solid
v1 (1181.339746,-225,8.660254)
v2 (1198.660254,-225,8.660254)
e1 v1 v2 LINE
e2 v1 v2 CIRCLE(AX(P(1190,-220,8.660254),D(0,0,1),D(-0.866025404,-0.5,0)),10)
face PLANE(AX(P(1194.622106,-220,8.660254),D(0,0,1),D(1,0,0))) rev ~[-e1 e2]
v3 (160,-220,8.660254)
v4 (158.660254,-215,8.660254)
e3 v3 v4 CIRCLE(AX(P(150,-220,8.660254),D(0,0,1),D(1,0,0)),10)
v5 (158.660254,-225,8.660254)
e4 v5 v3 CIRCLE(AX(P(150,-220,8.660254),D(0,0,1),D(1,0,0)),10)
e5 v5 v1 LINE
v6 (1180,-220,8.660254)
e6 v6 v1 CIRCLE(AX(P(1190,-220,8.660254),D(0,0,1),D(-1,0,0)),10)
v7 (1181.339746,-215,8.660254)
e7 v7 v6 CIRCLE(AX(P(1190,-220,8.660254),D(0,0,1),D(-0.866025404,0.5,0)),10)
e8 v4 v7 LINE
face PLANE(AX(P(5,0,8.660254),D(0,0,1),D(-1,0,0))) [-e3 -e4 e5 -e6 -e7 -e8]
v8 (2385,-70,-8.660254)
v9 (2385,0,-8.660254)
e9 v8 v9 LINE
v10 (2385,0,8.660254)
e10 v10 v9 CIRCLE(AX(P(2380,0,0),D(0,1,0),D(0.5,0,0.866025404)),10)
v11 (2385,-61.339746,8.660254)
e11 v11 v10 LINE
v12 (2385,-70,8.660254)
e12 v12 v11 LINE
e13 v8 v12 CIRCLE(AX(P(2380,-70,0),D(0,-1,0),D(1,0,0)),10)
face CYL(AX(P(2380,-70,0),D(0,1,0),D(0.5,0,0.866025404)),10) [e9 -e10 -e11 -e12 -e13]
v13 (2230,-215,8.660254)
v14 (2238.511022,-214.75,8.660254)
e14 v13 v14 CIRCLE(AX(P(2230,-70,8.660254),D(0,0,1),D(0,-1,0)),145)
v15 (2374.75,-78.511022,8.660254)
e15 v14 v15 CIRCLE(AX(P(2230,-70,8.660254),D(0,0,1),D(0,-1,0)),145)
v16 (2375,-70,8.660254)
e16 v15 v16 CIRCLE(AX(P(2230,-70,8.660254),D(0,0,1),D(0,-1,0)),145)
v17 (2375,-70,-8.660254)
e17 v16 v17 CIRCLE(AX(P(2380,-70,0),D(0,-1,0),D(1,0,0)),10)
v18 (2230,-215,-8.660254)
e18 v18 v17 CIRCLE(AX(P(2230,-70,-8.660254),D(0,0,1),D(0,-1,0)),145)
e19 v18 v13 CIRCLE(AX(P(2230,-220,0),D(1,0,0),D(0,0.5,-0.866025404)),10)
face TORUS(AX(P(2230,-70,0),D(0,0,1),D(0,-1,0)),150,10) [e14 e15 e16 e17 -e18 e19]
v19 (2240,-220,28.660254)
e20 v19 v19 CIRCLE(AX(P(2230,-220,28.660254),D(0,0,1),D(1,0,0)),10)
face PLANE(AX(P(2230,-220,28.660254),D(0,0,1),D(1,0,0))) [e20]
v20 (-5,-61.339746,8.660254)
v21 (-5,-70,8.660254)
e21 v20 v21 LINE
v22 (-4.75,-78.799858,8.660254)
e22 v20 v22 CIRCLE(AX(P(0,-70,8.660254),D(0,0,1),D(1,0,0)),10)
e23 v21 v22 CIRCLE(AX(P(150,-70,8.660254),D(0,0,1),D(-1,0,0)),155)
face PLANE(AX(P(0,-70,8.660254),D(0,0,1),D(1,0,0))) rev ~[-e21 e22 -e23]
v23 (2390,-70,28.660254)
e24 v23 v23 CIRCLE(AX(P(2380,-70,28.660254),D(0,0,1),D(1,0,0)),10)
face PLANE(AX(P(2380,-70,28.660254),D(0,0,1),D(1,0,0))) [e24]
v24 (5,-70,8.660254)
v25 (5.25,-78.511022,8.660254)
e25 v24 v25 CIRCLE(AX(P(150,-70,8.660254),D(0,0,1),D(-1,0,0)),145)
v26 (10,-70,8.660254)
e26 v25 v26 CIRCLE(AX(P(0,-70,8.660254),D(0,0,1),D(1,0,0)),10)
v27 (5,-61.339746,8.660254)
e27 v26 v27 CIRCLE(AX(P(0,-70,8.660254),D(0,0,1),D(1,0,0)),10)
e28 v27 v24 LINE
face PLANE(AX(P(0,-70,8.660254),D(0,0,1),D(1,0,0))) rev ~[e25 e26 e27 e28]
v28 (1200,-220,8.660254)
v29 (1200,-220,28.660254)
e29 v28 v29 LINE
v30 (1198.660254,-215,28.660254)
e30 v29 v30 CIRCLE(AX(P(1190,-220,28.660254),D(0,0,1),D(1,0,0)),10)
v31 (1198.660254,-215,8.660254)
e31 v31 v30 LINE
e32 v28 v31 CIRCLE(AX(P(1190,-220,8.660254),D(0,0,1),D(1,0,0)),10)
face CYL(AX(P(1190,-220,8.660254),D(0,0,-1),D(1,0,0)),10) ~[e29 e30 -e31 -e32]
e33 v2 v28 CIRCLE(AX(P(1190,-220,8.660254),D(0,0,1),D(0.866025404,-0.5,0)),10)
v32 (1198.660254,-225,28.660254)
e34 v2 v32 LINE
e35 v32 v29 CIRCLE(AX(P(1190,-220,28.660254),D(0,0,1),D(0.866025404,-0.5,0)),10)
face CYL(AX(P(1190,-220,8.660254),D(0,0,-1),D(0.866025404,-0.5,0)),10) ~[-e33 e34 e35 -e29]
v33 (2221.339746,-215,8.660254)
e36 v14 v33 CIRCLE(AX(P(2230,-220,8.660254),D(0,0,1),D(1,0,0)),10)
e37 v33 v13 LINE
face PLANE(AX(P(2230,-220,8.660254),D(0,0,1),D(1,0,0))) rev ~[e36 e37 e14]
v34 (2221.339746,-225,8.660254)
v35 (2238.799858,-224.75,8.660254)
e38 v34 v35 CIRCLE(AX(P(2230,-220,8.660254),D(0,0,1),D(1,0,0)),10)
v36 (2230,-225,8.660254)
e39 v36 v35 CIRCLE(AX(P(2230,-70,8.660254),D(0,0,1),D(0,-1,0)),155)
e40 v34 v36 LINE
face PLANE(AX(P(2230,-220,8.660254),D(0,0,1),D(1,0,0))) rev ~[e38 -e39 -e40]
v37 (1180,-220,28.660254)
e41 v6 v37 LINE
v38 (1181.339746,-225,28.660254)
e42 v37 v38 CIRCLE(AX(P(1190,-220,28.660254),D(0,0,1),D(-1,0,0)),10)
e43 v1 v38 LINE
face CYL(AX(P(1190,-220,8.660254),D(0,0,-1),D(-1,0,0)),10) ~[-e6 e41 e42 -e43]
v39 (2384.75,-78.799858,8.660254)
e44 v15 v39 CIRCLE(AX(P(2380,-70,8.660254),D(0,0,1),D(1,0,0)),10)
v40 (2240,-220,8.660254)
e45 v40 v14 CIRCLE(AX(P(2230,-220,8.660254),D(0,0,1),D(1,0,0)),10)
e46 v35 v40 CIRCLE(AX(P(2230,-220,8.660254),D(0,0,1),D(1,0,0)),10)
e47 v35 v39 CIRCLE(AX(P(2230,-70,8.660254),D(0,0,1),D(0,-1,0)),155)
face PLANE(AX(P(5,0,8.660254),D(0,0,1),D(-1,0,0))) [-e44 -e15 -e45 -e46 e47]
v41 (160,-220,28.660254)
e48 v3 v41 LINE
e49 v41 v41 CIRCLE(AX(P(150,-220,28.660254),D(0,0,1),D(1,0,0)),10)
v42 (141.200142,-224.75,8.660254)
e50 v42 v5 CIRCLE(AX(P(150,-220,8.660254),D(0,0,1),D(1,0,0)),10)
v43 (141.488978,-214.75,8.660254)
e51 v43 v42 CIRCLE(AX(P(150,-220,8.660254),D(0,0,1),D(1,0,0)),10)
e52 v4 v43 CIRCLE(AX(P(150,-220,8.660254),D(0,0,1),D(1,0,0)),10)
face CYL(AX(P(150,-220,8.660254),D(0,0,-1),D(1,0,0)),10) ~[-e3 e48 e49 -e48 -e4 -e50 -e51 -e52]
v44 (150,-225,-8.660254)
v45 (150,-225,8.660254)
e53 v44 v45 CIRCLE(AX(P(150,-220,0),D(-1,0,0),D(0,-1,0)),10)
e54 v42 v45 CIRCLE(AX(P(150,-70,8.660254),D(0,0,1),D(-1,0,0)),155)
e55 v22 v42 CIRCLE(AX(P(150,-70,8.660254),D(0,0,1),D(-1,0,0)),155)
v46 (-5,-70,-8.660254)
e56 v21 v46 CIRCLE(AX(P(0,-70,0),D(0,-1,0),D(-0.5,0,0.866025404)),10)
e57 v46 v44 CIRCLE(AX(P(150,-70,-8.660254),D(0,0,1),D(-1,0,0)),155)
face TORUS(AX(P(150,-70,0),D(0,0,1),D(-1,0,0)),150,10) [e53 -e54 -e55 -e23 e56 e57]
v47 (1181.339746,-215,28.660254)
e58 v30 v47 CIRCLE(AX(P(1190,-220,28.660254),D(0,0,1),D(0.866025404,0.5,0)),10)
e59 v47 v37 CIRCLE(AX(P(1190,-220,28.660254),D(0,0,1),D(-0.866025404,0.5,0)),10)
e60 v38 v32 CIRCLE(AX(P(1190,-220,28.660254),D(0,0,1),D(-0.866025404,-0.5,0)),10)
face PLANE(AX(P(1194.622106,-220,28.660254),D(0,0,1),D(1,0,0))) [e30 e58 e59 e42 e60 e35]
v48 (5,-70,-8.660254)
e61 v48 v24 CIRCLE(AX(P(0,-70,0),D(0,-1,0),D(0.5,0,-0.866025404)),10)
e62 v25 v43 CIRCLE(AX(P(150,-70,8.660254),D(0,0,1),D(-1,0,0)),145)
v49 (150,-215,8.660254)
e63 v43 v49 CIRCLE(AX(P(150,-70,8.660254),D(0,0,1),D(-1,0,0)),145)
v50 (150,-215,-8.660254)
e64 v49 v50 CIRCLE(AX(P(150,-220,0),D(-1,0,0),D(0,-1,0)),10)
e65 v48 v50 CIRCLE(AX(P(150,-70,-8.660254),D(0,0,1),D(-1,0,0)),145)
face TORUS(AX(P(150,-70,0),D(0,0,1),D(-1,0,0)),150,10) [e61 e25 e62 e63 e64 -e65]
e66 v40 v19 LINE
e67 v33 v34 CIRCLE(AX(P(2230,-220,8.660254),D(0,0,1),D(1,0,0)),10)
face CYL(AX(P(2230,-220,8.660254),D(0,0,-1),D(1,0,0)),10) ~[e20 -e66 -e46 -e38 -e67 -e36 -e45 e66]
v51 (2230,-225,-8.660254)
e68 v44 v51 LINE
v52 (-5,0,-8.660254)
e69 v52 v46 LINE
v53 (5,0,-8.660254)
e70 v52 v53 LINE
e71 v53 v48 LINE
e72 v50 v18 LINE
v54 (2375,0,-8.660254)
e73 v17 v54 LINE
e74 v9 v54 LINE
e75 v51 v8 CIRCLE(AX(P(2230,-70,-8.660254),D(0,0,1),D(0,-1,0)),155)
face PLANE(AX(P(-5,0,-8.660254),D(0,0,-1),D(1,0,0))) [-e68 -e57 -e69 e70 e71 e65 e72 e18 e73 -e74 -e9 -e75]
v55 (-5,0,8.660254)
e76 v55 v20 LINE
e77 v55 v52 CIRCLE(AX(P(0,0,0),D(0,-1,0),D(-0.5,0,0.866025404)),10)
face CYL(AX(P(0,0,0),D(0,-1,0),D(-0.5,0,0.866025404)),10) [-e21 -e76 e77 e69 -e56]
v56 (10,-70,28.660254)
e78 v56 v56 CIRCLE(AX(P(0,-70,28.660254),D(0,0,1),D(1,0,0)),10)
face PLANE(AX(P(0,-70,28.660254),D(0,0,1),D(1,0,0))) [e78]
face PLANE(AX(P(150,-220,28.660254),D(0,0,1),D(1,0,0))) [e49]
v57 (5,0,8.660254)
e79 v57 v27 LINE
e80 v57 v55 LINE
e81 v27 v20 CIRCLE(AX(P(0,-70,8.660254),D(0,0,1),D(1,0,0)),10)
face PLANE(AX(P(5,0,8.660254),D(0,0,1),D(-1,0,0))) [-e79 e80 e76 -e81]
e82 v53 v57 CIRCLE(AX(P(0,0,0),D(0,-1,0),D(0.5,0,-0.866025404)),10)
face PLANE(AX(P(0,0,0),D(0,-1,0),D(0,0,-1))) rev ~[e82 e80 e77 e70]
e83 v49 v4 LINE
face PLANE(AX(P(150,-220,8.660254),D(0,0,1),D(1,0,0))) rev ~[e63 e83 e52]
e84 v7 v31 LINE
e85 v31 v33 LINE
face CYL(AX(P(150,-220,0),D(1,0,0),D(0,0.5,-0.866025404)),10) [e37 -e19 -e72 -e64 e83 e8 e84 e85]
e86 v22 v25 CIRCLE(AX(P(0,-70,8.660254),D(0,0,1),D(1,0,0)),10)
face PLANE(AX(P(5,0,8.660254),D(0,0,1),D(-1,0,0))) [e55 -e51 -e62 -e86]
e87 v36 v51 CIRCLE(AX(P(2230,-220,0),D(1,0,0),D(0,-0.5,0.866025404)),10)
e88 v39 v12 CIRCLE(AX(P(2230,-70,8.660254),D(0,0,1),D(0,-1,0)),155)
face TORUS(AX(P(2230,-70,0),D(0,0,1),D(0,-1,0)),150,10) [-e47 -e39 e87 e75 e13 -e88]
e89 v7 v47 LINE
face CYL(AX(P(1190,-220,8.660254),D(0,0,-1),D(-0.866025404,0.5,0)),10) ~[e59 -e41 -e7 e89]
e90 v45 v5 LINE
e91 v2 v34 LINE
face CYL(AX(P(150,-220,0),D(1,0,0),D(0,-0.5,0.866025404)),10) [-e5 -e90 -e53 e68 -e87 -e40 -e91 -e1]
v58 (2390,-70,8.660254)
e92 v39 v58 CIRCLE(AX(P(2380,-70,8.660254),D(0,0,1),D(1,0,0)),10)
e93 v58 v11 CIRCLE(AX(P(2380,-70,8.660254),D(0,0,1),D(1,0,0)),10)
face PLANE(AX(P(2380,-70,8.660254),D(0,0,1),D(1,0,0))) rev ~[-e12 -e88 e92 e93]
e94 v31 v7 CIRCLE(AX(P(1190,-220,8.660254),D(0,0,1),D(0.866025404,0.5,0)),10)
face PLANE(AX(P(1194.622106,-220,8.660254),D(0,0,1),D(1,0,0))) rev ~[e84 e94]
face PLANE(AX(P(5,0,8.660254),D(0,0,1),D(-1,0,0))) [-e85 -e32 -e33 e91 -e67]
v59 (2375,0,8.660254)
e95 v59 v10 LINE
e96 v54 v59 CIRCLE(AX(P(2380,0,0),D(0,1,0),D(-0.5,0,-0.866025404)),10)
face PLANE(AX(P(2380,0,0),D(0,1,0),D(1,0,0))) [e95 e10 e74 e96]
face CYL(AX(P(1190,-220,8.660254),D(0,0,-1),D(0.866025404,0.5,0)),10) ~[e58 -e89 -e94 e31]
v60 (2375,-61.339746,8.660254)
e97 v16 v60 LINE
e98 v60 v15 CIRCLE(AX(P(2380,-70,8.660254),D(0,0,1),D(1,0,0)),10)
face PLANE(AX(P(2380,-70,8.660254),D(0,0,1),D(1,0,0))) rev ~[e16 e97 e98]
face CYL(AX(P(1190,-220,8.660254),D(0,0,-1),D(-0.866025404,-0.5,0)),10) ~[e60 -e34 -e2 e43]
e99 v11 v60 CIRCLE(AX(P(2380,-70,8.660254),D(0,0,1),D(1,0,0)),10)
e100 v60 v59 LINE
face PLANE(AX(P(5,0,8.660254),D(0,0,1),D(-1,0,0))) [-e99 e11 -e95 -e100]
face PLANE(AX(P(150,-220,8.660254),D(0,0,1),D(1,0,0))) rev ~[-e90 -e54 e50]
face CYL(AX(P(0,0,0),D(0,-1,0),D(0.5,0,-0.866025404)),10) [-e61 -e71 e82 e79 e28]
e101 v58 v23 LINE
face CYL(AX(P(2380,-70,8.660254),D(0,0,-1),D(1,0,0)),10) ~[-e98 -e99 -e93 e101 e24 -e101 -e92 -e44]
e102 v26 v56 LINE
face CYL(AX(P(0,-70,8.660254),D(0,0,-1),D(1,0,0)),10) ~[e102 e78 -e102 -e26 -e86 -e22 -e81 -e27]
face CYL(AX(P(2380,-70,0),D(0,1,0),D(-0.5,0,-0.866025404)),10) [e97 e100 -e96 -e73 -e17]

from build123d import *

# Parameters (mm, degrees)
F3_R     = 10
F4_DEPTH = 20
F6_DEPTH = 20


with BuildPart() as f2:
    # F2: sweep along a path in F1
    with BuildLine(Plane.XY) as f2_path:
        Line((0, 0), (0, -70))
        ThreePointArc((0, -70), (43.933982822, -176.066017178), (150, -220))
        Line((150, -220), (2230, -220))
        ThreePointArc((2230, -220), (2336.066017178, -176.066017178), (2380, -70))
        Line((2380, -70), (2380, 0))
    # F0 (on Front) → F2 (sweep)
    with BuildSketch(Plane.XZ):
        with BuildLine():
            Line((0, 8.6602540378), (-5, 8.6602540378))
            ThreePointArc((-5, 8.6602540378), (-10, 0), (-5, -8.6602540378))
            Line((-5, -8.6602540378), (5, -8.6602540378))
            ThreePointArc((5, -8.6602540378), (10, 0), (5, 8.6602540378))
            Line((5, 8.6602540378), (0, 8.6602540378))
        make_face()
    sweep(path=f2_path.line)

    # F3 (on face) → F4 (join)
    with BuildSketch(Plane.XY.offset(8.6602540378)):
        with Locations((0, -70)):
            Circle(F3_R)
        with Locations((150, -220)):
            Circle(F3_R)
        with Locations((2380, -70)):
            Circle(F3_R)
        with Locations((2230, -220)):
            Circle(F3_R)
    extrude(amount=F4_DEPTH)

    # F5 (on face) → F6 (join)
    with BuildSketch(Plane.XY.offset(8.6602540378)):
        with BuildLine():
            Line((1198.6602540378, -215), (1190, -215))
            Line((1190, -215), (1190, -220))
            Line((1190, -220), (1190, -225))
            Line((1190, -225), (1198.6602540378, -225))
            ThreePointArc((1198.6602540378, -225), (1199.6592582629, -222.588190451), (1200, -220))
            ThreePointArc((1200, -220), (1199.6592582629, -217.411809549), (1198.6602540378, -215))
        make_face()
        with BuildLine():
            Line((1181.3397459622, -215), (1190, -215))
            Line((1190, -215), (1198.6602540378, -215))
            ThreePointArc((1198.6602540378, -215), (1190, -210), (1181.3397459622, -215))
        make_face()
        with BuildLine():
            Line((1190, -220), (1190, -215))
            Line((1190, -215), (1181.3397459622, -215))
            ThreePointArc((1181.3397459622, -215), (1180.3407417371, -217.411809549), (1180, -220))
            Line((1180, -220), (1190, -220))
        make_face()
        with BuildLine():
            Line((1190, -225), (1190, -220))
            Line((1190, -220), (1180, -220))
            ThreePointArc((1180, -220), (1180.3407417371, -222.588190451), (1181.3397459622, -225))
            Line((1181.3397459622, -225), (1190, -225))
        make_face()
        with BuildLine():
            Line((1198.6602540378, -225), (1190, -225))
            Line((1190, -225), (1181.3397459622, -225))
            ThreePointArc((1181.3397459622, -225), (1190, -230), (1198.6602540378, -225))
        make_face()
    extrude(amount=F6_DEPTH)


solid = f2.part
